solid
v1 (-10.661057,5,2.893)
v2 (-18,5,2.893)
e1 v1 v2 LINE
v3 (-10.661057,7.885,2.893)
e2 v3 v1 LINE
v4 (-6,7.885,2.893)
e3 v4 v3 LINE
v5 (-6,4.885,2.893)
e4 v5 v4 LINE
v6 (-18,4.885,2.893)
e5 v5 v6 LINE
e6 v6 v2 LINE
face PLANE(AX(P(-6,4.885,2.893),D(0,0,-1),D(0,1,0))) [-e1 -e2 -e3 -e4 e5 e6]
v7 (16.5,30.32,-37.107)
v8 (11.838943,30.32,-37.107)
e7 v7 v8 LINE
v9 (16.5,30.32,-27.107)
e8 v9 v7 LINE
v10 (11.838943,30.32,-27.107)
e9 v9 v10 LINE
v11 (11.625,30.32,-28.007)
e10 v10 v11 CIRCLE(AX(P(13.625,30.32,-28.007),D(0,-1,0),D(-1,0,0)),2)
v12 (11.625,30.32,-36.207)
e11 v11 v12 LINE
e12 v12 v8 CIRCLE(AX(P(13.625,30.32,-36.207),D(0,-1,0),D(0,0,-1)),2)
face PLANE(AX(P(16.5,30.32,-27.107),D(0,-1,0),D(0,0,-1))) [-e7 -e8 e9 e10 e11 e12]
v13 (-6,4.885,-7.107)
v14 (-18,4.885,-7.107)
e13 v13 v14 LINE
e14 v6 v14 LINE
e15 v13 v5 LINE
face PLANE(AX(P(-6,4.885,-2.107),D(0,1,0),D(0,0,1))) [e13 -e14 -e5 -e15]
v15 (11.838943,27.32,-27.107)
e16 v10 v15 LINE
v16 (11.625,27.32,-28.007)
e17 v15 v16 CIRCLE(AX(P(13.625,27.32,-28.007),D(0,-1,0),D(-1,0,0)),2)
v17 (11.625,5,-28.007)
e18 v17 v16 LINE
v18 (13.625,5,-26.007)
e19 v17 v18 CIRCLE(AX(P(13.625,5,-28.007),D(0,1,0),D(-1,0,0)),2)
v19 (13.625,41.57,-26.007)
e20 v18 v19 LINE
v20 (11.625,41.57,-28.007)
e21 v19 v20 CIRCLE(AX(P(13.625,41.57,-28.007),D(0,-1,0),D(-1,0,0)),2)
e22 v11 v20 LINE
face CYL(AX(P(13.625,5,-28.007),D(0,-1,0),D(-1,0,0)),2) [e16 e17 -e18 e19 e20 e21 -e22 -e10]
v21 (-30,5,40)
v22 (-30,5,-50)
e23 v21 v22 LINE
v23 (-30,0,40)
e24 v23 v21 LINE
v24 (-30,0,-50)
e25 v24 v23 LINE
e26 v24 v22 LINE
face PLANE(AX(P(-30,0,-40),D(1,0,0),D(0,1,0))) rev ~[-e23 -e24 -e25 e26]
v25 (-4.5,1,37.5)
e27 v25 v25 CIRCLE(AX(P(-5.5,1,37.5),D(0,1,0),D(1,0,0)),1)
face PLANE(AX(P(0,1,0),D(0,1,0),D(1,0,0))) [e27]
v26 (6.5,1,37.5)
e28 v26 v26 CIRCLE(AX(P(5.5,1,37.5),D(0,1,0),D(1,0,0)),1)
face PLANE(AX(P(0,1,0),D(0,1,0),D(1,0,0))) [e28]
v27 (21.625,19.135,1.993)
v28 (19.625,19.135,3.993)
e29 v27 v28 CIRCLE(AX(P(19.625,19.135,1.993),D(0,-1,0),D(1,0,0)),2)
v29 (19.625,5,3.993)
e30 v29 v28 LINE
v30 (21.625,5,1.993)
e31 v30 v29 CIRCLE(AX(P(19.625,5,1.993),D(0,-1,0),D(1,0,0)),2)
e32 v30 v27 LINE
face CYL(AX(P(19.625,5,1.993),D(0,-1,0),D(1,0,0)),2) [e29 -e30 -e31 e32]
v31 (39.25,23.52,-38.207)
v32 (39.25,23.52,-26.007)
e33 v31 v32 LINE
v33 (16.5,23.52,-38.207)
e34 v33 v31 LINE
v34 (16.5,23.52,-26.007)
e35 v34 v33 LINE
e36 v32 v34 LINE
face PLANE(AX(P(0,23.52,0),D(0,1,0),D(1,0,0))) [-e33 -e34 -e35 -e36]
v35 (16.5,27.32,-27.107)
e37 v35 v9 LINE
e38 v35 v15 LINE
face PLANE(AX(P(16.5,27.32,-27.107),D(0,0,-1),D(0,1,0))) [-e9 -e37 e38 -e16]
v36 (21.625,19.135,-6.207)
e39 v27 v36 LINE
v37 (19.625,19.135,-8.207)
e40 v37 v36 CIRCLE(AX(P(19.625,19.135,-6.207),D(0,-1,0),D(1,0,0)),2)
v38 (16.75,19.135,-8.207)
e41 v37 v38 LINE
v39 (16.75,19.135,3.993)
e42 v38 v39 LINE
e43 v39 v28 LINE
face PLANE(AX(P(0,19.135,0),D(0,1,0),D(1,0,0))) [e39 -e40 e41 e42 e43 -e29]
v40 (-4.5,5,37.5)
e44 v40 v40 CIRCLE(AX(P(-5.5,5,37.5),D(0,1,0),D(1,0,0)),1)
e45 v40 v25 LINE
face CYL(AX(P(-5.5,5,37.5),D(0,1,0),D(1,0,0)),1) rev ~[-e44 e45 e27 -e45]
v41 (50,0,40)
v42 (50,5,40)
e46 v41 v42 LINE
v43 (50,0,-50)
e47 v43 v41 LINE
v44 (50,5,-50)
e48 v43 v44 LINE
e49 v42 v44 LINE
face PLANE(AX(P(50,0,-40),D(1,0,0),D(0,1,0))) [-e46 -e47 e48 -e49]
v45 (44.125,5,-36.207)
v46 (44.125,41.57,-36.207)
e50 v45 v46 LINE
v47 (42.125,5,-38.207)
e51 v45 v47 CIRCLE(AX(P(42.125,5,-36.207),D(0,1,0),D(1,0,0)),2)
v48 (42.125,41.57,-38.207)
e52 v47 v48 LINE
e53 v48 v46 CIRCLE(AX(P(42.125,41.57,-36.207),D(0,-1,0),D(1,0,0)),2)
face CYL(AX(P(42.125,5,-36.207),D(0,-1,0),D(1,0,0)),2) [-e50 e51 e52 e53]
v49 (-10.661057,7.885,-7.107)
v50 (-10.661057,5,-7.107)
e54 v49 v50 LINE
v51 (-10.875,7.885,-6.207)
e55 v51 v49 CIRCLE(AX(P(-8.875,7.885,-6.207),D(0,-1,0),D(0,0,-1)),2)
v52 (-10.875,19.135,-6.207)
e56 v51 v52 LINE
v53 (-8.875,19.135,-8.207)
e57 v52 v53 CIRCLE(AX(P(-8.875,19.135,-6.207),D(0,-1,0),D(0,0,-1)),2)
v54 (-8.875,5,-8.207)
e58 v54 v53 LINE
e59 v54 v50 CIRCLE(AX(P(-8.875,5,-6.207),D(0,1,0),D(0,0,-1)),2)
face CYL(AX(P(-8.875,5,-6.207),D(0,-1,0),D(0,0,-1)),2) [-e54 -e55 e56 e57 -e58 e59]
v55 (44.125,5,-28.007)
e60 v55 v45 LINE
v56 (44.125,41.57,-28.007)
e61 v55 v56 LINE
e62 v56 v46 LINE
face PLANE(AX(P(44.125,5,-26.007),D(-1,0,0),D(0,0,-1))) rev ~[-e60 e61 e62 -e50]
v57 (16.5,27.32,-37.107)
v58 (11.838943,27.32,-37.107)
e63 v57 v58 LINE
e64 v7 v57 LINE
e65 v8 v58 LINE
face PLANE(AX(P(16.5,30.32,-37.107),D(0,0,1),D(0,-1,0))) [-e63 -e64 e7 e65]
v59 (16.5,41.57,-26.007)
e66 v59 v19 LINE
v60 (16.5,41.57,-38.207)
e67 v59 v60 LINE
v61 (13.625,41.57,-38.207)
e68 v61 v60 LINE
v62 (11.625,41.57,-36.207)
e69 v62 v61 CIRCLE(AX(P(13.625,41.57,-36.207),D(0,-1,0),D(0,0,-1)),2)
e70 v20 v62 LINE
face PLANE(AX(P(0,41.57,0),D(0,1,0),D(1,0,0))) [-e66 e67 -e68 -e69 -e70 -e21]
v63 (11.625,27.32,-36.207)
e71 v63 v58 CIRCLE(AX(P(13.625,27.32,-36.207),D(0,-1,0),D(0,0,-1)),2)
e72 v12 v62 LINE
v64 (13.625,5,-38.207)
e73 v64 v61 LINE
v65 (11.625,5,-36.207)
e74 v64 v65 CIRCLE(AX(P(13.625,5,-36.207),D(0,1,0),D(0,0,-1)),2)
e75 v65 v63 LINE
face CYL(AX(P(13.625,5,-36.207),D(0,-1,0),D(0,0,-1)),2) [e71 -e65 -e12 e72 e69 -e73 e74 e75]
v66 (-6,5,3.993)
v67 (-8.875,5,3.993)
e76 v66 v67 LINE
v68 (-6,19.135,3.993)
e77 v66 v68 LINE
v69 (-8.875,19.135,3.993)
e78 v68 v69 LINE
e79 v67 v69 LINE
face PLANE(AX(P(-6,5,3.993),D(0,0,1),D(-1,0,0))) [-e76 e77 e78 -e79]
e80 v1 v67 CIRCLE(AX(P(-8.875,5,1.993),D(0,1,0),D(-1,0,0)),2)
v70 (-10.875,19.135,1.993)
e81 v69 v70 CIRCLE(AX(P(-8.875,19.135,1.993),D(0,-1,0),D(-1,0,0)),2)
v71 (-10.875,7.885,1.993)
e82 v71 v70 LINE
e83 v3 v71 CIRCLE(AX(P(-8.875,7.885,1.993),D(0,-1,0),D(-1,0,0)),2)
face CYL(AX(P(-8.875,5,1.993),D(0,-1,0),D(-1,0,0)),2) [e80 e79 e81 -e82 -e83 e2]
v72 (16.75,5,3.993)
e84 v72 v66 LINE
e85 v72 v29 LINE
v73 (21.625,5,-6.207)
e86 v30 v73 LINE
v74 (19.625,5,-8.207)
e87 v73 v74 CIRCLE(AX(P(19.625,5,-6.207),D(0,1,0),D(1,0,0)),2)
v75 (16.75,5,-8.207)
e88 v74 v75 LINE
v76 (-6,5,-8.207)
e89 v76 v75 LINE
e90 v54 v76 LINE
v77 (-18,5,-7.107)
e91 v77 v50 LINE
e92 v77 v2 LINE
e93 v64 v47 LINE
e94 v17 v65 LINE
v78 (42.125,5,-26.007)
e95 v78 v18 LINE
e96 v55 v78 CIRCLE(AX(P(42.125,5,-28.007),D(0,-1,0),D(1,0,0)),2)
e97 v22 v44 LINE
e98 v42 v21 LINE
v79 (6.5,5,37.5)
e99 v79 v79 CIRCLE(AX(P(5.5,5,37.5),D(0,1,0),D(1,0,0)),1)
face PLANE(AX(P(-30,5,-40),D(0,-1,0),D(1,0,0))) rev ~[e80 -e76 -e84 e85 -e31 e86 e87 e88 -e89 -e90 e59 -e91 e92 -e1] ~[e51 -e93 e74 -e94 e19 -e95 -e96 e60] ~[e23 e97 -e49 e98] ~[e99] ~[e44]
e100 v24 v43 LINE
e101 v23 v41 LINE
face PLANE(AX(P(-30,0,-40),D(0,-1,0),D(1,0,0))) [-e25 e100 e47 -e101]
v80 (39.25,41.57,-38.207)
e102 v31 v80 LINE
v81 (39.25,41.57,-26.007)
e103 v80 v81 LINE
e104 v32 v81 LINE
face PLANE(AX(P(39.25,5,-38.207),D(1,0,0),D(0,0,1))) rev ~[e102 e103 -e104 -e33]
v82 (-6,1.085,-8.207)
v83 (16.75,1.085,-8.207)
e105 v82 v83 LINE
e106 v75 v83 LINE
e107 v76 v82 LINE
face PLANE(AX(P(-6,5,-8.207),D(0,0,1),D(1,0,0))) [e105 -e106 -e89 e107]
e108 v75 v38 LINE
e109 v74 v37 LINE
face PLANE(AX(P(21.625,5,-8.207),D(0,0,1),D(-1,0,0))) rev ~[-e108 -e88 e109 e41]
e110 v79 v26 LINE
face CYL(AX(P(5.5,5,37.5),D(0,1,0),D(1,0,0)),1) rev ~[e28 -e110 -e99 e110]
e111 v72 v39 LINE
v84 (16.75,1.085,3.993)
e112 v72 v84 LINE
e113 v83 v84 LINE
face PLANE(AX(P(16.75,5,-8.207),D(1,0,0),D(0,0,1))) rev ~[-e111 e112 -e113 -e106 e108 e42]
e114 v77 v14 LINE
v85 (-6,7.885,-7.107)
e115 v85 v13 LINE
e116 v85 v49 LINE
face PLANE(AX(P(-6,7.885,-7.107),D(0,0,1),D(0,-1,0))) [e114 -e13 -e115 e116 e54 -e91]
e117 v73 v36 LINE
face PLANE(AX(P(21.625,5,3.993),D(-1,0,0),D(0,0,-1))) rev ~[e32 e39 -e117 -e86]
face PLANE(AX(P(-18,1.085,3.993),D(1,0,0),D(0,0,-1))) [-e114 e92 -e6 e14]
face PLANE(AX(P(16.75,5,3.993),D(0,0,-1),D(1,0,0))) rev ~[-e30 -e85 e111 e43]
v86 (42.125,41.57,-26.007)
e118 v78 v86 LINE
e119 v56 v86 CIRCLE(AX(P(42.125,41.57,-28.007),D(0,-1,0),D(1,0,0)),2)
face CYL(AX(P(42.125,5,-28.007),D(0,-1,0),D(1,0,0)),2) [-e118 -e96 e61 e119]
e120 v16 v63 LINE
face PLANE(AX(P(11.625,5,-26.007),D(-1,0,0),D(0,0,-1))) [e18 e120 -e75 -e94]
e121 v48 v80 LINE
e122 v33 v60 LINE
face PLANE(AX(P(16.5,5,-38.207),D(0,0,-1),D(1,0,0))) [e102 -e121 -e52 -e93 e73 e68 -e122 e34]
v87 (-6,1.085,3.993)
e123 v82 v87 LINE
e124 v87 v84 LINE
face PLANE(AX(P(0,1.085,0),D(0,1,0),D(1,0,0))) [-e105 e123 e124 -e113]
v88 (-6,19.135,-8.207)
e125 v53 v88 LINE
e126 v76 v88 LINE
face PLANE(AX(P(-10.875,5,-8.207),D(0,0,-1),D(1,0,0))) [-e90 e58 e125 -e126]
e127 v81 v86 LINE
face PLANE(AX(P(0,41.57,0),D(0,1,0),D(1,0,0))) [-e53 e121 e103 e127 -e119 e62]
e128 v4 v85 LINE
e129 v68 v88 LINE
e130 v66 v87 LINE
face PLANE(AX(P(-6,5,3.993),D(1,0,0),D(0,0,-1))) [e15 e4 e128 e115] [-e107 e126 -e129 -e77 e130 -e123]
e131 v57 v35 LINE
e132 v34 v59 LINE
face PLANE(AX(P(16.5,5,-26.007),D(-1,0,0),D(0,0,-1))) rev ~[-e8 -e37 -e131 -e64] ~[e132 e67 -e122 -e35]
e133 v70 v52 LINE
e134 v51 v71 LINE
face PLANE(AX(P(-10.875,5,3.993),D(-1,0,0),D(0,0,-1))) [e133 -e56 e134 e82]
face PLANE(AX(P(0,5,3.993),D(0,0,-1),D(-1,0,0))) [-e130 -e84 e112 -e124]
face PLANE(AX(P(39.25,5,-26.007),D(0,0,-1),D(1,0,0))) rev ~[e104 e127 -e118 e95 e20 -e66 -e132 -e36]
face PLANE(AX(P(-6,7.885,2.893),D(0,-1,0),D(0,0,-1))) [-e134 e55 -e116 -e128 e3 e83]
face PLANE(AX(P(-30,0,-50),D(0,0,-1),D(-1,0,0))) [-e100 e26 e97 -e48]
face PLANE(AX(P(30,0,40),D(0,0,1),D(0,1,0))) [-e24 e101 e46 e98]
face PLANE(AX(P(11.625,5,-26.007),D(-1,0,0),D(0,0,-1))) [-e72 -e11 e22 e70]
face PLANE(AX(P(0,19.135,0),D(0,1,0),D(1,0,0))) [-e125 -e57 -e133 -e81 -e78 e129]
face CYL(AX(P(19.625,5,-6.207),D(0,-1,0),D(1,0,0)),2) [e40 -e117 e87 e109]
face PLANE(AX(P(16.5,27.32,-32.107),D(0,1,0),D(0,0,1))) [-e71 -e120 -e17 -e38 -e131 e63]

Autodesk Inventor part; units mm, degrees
ref_plane "YZ Plane" through (0, 0, 0) normal (1, 0, 0) x (0, 1, 0)
ref_plane "XZ Plane" through (0, 0, 0) normal (0, 1, 0) x (-1, 0, 0)
ref_plane "XY Plane" through (0, 0, 0) normal (0, 0, 1) x (1, 0, 0)
sketch "Sketch1" plane through (0, 0, 0) normal (0, 1, 0) x (-1, 0, 0)
  line L0 (-30, -40) -> (-30, 40)
  line L1 (-30, 40) -> (30, 40)
  line L2 (30, 40) -> (30, -40)
  line L3 (30, -40) -> (-30, -40)
  line L4 (-30, -40) -> (30, 40) construction
  line L5 (-30, 40) -> (30, -40) construction
  point P0 (0, 0)
  dimension "d0" = 80
  dimension "d1" = 60
extrude "Extrusion1" add sketch "Sketch1" along normal blind 5
sketch "Sketch2" plane through (0, 5, 0) normal (0, 1, 0) x (1, 0, 0)
  circle A0 centre (-5.5, -37.5) radius 1
  circle A1 centre (5.5, -37.5) radius 1
  line L0 (-30, -40) -> (30, -40) projected
  line L1 (30, -40) -> (30, 40) projected
  point P0 (0, 0)
  dimension "d4" = 2
  dimension "d5" = 2
  dimension "d6" = 11
  dimension "d7" = 2.5
  dimension "d8" = 2.5
  dimension "d9" = 24.5
extrude "Extrusion2" cut sketch "Sketch2" against normal blind 4
sketch "Sketch3" plane through (0, 5, 0) normal (0, 1, 0) x (1, 0, 0)
  line L0 (30, -40) -> (30, 40) projected
  line L1 (30, -40) -> (0, -40)
  line L2 (-30, -40) -> (30, -40) projected
  line L3 (0, -40) -> (0, 2.107)
  line L4 (0, 2.107) -> (-6, 2.107)
  line L5 (-6, 2.107) -> (-6, 8.207)
  line L6 (-6, 8.207) -> (16.75, 8.207)
  line L7 (16.75, 8.207) -> (16.75, -3.993)
  line L8 (16.75, -3.993) -> (-6, -3.993)
  line L9 (-6, -3.993) -> (-6, 8.207)
  point P0 (0, 0)
  dimension "d12" = 42.107
  dimension "d13" = 6
  dimension "d14" = 6.1
  dimension "d15" = 22.75
  dimension "d16" = 12.2
extrude "Extrusion3" cut sketch "Sketch3" against normal blind 3.915
sketch "Sketch4" plane through (30, 0, 40) normal (1, 0, 0) x (0, 0, -1)
  line L0 (0, 0) -> (80, 0) projected
  line L1 (0, 5) -> (80, 5)
  line L2 (80, 5) -> (80, 0)
  line L3 (80, 0) -> (0, 0)
  line L4 (0, 0) -> (0, 5)
  point P0 (40, 0)
extrude "Extrusion4" add sketch "Sketch4" along normal blind 20
sketch "Sketch5" plane through (-30, 0, -40) normal (0, 0, -1) x (-1, 0, 0)
  line L0 (0, 5) -> (-80, 5) projected
  line L1 (0, 0) -> (0, 5) projected
  line L2 (-80, 5) -> (0, 5)
  line L3 (0, 5) -> (0, 0)
  line L4 (0, 0) -> (-80, 0)
  line L5 (-80, 0) -> (-80, 5)
  point P0 (-30, 0)
extrude "Extrusion5" add sketch "Sketch5" along normal blind 10
sketch "Sketch6" plane through (0, 5, 0) normal (0, 1, 0) x (1, 0, 0)
  line L0 (-30, -40) -> (-30, 50) projected
  line L1 (-30, -40) -> (0, -40)
  line L2 (-30, -40) -> (50, -40) projected
  line L3 (0, -40) -> (0, 32.107)
  line L4 (0, 32.107) -> (22.5, 32.107)
  line L5 (22.5, 32.107) -> (16.5, 32.107)
  line L6 (16.5, 32.107) -> (16.5, 38.207)
  line L7 (16.5, 38.207) -> (39.25, 38.207)
  line L8 (39.25, 38.207) -> (39.25, 26.007)
  line L9 (39.25, 26.007) -> (16.5, 26.007)
  line L10 (16.5, 26.007) -> (16.5, 38.207)
  point P0 (0, 0)
  dimension "d23" = 30
  dimension "d24" = 72.107
  dimension "d25" = 22.5
  dimension "d26" = 6
  dimension "d27" = 6.1
  dimension "d28" = 22.75
  dimension "d29" = 12.2
extrude "Extrusion6" add sketch "Sketch6" along normal blind 18.52
sketch "Sketch7" plane through (0, 5, 0) normal (0, 1, 0) x (1, 0, 0)
  line L0 (16.75, 8.207) -> (16.75, -3.993) projected
  line L1 (16.75, -3.993) -> (21.625, -3.993)
  line L2 (21.625, -3.993) -> (21.625, 8.207)
  line L3 (21.625, 8.207) -> (16.75, 8.207)
  line L4 (16.75, 8.207) -> (16.75, -3.993)
  line L5 (-6, -3.993) -> (-6, 8.207) projected
  line L6 (-6, -3.993) -> (-10.875, -3.993)
  line L7 (-10.875, -3.993) -> (-10.875, 8.207)
  line L8 (-10.875, 8.207) -> (-6, 8.207)
  line L9 (-6, 8.207) -> (-6, -3.993)
  point P0 (0, 0)
  dimension "d32" = 4.875
  dimension "d33" = 4.875
  dimension "d34" = 12.2
extrude "Extrusion7" add sketch "Sketch7" along normal blind 14.135
sketch "Sketch8" plane through (-6, 1.085, 3.993) normal (1, 0, 0) x (0, 0, -1)
  line L0 (0, 0) -> (12.2, 0) projected
  line L1 (6.1, 0) -> (6.1, 3.8)
  line L2 (6.1, 3.8) -> (11.1, 3.8)
  line L3 (11.1, 3.8) -> (1.1, 3.8)
  line L4 (1.1, 3.8) -> (1.1, 6.8)
  line L5 (1.1, 6.8) -> (11.1, 6.8)
  line L6 (11.1, 6.8) -> (11.1, 3.8)
  point P0 (3.993, -1.085)
  dimension "d37" = 3.8
  dimension "d38" = 5
  dimension "d39" = 10
  dimension "d40" = 3
extrude "Extrusion8" cut sketch "Sketch8" against normal blind 12
sketch "Sketch9" plane through (0, 5, 0) normal (0, 1, 0) x (1, 0, 0)
  line L0 (16.5, 26.007) -> (16.5, 38.207) projected
  line L1 (16.5, 26.007) -> (11.625, 26.007)
  line L2 (11.625, 26.007) -> (11.625, 38.207)
  line L3 (11.625, 38.207) -> (16.5, 38.207)
  line L4 (16.5, 38.207) -> (16.5, 26.007)
  line L5 (39.25, 26.007) -> (16.5, 26.007) projected
  line L6 (39.25, 26.007) -> (44.125, 26.007)
  line L7 (44.125, 26.007) -> (44.125, 38.207)
  line L8 (44.125, 38.207) -> (39.25, 38.207)
  line L9 (39.25, 38.207) -> (39.25, 26.007)
  point P0 (0, 0)
  dimension "d43" = 4.875
  dimension "d44" = 12.2
  dimension "d45" = 4.875
  dimension "d46" = 12.2
extrude "Extrusion9" add sketch "Sketch9" along normal blind 36.57
sketch "Sketch10" plane through (16.5, 23.52, -38.207) normal (1, 0, 0) x (0, 0, -1)
  line L0 (0, 0) -> (-12.2, 0) projected
  line L1 (-6.1, 0) -> (-6.1, 3.8)
  line L2 (-6.1, 3.8) -> (-1.1, 3.8)
  line L3 (-1.1, 3.8) -> (-11.1, 3.8)
  line L4 (-11.1, 3.8) -> (-11.1, 6.8)
  line L5 (-11.1, 6.8) -> (-1.1, 6.8)
  line L6 (-1.1, 6.8) -> (-1.1, 3.8)
  point P0 (-38.207, -23.52)
  point P1 (-6.1, 3.8)
  dimension "d49" = 3.8
  dimension "d50" = 5
  dimension "d51" = 10
  dimension "d52" = 3
extrude "Extrusion10" cut sketch "Sketch10" against normal up to surface (4.875 mm away)
fillet "Fillet1" radius 2 8 edges at (21.625, 12.0675, 3.993) (21.625, 12.0675, -8.207) (-10.875, 12.0675, 3.993) (-10.875, 12.0675, -8.207) (11.625, 23.285, -38.207) (11.625, 23.285, -26.007) (44.125, 23.285, -26.007) (44.125, 23.285, -38.207)
properties part number "Base"
